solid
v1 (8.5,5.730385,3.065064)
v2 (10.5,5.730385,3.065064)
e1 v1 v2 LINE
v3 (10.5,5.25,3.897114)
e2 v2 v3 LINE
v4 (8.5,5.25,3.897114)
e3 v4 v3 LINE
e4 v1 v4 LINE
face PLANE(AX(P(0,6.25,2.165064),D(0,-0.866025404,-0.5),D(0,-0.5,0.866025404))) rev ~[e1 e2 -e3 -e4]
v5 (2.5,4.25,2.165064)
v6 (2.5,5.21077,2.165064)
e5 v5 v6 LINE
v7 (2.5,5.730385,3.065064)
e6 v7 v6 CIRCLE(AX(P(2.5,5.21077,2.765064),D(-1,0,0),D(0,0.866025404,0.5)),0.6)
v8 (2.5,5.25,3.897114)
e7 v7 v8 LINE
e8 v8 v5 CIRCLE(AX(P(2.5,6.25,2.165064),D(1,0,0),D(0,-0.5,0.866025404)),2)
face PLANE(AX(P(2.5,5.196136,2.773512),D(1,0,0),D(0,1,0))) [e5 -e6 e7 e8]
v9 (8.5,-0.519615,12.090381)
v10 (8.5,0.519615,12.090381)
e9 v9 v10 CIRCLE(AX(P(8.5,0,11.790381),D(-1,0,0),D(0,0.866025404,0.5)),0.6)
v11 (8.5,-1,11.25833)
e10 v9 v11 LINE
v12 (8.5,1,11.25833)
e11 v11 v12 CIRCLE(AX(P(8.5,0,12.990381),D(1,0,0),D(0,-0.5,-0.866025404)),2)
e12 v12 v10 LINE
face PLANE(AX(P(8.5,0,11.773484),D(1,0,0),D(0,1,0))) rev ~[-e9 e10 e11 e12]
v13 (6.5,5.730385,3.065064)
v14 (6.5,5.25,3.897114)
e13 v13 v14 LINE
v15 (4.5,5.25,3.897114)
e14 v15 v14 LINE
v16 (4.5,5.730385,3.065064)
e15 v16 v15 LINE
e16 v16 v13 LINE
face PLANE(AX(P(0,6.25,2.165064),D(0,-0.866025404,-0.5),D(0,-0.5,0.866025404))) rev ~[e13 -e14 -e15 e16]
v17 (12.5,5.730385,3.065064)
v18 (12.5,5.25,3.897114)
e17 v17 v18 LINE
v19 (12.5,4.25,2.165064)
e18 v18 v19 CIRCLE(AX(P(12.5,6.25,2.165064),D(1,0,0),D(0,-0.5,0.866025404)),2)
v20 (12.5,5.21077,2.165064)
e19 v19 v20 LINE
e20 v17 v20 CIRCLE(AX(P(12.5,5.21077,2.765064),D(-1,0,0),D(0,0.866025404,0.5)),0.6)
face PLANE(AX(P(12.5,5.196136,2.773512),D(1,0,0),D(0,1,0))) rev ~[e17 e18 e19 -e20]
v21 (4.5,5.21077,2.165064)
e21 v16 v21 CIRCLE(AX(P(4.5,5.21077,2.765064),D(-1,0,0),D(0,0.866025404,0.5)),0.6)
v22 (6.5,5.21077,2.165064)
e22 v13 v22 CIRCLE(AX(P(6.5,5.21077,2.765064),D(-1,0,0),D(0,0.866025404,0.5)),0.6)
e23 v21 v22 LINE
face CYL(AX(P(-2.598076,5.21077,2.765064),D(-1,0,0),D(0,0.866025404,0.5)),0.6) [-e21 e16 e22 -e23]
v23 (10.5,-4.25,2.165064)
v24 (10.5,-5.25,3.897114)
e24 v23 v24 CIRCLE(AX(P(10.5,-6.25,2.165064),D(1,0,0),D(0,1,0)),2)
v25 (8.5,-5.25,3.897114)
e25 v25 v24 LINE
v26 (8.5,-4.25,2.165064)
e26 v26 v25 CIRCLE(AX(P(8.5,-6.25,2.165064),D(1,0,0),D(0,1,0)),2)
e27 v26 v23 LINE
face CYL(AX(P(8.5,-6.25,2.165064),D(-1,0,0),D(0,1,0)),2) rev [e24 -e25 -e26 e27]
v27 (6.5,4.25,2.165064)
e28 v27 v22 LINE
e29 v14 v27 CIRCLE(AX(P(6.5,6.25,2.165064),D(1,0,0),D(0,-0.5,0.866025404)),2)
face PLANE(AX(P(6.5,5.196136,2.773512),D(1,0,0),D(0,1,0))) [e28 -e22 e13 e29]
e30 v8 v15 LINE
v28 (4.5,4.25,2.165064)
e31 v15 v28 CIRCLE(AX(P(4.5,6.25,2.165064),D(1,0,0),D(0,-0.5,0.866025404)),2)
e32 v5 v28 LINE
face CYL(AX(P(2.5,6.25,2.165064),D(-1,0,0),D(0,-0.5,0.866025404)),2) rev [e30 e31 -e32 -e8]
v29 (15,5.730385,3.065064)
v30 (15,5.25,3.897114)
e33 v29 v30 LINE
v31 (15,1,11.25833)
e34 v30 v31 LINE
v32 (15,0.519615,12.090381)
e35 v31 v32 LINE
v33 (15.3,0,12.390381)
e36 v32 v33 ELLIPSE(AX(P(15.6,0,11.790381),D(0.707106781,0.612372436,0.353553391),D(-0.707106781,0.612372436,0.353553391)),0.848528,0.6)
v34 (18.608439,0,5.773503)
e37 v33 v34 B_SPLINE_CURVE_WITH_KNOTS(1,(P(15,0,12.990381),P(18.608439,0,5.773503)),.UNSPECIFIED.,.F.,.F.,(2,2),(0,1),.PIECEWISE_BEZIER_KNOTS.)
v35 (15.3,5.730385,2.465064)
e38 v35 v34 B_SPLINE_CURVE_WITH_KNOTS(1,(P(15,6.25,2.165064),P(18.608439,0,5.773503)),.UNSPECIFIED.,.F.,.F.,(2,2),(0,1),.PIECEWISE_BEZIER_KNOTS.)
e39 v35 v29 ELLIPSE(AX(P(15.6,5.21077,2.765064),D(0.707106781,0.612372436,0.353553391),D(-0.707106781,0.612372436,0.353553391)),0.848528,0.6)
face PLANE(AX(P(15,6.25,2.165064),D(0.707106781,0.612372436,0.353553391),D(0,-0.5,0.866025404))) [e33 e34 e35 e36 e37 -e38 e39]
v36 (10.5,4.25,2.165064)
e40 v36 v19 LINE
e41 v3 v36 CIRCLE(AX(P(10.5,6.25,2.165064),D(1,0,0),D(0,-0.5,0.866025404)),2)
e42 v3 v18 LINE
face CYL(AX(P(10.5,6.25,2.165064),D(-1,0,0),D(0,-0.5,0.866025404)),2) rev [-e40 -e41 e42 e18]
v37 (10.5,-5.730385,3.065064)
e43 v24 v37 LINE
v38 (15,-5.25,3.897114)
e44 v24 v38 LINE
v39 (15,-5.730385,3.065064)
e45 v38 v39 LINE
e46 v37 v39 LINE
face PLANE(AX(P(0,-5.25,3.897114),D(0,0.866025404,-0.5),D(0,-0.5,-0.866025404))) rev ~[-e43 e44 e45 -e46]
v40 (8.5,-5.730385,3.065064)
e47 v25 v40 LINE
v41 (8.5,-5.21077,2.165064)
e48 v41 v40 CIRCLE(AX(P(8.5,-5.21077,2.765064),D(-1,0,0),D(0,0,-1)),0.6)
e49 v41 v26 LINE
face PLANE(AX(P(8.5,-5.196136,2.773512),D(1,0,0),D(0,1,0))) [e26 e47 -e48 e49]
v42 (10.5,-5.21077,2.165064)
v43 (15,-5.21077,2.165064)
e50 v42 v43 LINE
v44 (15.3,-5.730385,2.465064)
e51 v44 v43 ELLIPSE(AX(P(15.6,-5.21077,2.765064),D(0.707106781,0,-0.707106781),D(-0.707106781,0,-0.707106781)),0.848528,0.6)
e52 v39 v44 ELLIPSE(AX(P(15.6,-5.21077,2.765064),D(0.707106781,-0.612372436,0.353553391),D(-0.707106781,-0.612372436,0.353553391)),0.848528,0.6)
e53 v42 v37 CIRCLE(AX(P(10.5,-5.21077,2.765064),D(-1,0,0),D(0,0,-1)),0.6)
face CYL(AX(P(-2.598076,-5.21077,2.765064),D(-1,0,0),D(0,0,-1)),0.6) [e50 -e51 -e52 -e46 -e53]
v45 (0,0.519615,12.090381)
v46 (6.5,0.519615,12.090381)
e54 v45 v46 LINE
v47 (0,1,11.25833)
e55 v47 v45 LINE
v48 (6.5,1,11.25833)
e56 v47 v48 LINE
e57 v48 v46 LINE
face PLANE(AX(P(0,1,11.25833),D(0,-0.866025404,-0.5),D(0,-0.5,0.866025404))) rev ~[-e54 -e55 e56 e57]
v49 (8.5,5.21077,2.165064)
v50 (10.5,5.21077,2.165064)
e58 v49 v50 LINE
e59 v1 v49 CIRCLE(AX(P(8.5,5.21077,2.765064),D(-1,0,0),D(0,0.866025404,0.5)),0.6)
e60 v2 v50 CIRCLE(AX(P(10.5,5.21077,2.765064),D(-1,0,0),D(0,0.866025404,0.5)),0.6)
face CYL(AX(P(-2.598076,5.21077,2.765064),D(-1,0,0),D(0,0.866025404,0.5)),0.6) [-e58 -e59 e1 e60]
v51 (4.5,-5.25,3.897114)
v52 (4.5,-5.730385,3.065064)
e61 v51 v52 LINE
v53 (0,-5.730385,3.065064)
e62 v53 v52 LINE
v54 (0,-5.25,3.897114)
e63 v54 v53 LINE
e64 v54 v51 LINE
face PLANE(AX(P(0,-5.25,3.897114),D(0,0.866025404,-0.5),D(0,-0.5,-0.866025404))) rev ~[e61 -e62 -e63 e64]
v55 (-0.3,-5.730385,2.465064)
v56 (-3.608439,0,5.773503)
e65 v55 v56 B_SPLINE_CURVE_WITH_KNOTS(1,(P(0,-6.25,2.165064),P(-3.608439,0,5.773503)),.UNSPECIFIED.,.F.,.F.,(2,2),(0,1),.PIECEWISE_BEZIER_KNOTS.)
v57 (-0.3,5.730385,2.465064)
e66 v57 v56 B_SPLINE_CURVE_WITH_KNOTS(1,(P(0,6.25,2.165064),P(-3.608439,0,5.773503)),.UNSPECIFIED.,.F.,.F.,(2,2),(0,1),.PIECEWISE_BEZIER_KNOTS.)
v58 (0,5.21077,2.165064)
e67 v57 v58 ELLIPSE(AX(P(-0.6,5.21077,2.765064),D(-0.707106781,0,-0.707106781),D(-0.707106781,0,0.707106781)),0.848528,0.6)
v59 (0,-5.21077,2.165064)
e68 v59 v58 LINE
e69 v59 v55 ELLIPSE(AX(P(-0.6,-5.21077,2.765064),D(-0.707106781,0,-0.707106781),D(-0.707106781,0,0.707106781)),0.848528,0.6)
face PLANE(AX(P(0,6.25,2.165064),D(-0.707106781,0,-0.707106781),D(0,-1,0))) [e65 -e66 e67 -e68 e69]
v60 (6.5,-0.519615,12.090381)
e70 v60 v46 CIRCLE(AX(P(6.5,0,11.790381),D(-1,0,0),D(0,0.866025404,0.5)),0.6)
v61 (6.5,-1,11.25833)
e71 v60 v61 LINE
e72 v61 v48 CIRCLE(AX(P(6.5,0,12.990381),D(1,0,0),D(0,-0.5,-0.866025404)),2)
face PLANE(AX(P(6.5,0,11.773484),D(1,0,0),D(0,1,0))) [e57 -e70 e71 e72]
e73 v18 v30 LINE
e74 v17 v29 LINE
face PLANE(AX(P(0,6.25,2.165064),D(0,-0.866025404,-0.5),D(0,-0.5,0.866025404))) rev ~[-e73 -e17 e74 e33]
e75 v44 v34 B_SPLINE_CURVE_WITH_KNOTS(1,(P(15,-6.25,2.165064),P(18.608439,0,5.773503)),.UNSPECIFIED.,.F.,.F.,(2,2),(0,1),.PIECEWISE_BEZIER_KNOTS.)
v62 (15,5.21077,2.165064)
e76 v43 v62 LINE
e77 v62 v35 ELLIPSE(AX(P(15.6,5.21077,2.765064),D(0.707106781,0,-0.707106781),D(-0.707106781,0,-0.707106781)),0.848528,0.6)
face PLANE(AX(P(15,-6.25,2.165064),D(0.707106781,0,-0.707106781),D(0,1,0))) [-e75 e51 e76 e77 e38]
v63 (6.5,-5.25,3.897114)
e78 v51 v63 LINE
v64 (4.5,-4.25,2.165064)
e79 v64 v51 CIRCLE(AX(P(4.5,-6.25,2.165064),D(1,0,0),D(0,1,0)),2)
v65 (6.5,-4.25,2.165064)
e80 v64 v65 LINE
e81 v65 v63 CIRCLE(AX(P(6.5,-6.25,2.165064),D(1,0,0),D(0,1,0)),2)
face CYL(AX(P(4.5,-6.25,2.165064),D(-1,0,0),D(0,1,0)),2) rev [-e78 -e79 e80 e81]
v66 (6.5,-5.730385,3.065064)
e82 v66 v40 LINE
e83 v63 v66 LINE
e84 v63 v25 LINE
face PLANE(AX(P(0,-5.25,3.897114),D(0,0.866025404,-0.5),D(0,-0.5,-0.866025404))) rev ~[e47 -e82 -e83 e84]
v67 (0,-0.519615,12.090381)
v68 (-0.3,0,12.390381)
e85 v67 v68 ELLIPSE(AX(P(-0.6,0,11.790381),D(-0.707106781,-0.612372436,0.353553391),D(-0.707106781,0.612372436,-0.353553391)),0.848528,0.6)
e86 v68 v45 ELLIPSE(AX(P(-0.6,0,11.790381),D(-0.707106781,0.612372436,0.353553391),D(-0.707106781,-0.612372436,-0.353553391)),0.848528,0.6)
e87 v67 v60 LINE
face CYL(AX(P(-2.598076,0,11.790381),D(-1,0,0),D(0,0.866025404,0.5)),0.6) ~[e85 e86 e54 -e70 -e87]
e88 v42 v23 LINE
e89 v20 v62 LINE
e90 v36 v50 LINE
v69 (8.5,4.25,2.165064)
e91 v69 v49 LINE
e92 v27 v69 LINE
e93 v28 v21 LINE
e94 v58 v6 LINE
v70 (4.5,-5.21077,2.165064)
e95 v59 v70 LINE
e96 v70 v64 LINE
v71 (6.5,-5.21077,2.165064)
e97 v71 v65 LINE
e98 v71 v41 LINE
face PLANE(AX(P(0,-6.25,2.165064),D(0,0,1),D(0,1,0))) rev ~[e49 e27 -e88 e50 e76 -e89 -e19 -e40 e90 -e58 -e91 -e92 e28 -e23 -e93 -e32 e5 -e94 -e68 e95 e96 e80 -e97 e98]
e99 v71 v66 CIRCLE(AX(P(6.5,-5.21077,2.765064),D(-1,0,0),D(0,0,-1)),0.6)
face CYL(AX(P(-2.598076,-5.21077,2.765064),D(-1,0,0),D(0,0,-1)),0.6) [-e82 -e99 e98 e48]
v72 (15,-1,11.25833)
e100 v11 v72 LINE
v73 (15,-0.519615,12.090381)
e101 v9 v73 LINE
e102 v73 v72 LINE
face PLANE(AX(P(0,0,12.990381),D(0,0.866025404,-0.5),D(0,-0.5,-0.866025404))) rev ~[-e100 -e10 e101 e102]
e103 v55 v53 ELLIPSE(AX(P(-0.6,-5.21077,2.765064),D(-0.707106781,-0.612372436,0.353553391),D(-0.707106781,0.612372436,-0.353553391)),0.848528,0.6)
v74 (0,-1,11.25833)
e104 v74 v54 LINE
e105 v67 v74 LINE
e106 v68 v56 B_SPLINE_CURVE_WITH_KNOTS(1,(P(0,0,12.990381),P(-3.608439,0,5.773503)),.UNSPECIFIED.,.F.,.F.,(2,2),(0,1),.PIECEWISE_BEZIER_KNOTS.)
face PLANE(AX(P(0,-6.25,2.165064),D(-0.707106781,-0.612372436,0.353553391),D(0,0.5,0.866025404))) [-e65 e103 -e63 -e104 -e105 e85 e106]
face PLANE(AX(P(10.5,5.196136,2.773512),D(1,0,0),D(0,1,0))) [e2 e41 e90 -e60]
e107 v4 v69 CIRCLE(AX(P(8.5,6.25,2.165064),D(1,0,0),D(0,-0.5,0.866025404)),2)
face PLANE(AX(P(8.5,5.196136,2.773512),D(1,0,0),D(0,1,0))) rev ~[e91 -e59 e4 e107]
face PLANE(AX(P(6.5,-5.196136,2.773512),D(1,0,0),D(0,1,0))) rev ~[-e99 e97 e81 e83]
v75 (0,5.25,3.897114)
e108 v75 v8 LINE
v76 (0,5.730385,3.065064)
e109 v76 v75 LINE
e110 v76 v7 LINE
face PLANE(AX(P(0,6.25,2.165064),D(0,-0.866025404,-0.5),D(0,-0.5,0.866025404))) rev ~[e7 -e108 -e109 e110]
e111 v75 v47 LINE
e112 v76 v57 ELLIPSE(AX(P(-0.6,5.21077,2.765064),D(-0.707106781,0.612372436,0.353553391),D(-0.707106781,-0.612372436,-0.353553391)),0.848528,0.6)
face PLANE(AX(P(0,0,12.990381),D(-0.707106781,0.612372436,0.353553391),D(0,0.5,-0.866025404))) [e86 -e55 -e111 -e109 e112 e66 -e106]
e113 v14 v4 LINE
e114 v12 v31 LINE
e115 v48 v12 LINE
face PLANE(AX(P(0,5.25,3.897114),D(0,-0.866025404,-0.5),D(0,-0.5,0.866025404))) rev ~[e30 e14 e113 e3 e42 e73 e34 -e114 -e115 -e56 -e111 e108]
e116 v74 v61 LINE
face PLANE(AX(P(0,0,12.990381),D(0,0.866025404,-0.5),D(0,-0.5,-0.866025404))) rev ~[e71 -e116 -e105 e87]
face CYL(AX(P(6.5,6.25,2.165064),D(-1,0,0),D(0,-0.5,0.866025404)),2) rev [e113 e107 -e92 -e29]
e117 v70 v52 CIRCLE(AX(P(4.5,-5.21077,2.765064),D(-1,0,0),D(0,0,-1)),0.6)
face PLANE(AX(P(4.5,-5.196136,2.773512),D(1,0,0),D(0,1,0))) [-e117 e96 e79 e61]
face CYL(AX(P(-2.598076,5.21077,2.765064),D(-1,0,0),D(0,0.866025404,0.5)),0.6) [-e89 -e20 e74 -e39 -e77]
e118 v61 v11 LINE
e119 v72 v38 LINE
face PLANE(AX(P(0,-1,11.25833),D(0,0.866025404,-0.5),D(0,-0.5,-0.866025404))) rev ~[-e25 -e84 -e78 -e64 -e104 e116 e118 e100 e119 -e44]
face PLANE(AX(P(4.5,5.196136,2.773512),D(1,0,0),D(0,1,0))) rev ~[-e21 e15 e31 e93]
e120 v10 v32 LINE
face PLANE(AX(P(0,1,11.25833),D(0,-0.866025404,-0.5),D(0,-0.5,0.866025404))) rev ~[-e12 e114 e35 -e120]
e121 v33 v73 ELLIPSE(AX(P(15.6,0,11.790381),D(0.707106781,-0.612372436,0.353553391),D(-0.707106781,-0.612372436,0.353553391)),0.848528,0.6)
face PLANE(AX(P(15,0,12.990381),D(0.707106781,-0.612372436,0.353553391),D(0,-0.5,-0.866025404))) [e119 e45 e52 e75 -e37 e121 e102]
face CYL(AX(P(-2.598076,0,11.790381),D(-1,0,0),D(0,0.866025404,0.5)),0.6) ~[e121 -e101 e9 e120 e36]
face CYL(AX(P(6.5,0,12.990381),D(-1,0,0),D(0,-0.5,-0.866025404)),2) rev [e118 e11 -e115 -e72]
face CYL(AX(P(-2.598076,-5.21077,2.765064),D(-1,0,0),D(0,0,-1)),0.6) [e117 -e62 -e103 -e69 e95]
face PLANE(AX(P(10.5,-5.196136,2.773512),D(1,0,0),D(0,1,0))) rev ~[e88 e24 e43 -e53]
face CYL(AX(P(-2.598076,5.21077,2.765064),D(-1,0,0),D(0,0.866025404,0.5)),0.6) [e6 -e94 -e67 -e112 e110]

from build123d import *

# Parameters (mm, degrees)
F1_DEPTH    = 15
F4_T1_DEPTH = 20.1961524227
F5_START    = 6.5
F5_DEPTH    = 2
F6_START    = 4.5
F6_DEPTH    = 2
F7_START    = 8.5
F7_DEPTH    = 2
F8_START    = 2.5
F8_DEPTH    = 2
F9_START    = 6.5
F9_DEPTH    = 2
F10_START   = 10.5
F10_DEPTH   = 2


# Not quite as in the source:
# - a fillet or chamfer that OpenCascade refuses, or shapes differently, is made with other operations: its cross-section is extruded or revolved along the edge and cut away or added
# - an extrude whose draft closes it to a point is written as a loft to that point
# - a feature names something its author has since deleted; it is built from what else it names


with BuildPart() as f1:
    # F0 (on Right) → F1 (new body)
    with BuildSketch(Plane.YZ):
        with BuildLine():
            Line((4.25, 2.1650635095), (6.25, 2.1650635095))
            Line((6.25, 2.1650635095), (5.25, 3.897114317))
            ThreePointArc((5.25, 3.897114317), (4.5179491924, 3.1650635095), (4.25, 2.1650635095))
        make_face()
        with BuildLine():
            ThreePointArc((4.25, 2.1650635095), (4.5179491924, 3.1650635095), (5.25, 3.897114317))
            Line((5.25, 3.897114317), (1, 11.2583302492))
            ThreePointArc((1, 11.2583302492), (0, 10.9903810568), (-1, 11.2583302492))
            Line((-1, 11.2583302492), (-5.25, 3.897114317))
            ThreePointArc((-5.25, 3.897114317), (-4.5179491924, 3.1650635095), (-4.25, 2.1650635095))
            Line((-4.25, 2.1650635095), (4.25, 2.1650635095))
        make_face()
        with BuildLine():
            ThreePointArc((-1, 11.2583302492), (0, 10.9903810568), (1, 11.2583302492))
            Line((1, 11.2583302492), (0, 12.9903810568))
            Line((0, 12.9903810568), (-1, 11.2583302492))
        make_face()
        with BuildLine():
            Line((-6.25, 2.1650635095), (-4.25, 2.1650635095))
            ThreePointArc((-4.25, 2.1650635095), (-4.5179491924, 3.1650635095), (-5.25, 3.897114317))
            Line((-5.25, 3.897114317), (-6.25, 2.1650635095))
        make_face()
    extrude(amount=F1_DEPTH)

    # F1_face (on face) → F2 section 0
    with BuildSketch(Plane(origin=(0, 0, 5.7735026919), x_dir=(0, 1, 0), z_dir=(-1, 0, 0)), mode=Mode.PRIVATE) as f2_s0:
        Polygon((0, -7.2168783649), (6.25, 3.6084391824), (-6.25, 3.6084391824), align=None)
    loft([f2_s0.sketch, Vertex(-3.6084391824, 0, 5.7735026919)], ruled=True)

    # F1_face1 (on face) → F3 section 0
    with BuildSketch(Plane(origin=(15, 0, 5.7735026919), x_dir=(0, 1, 0), z_dir=(1, 0, 0)), mode=Mode.PRIVATE) as f3_s0:
        Polygon((6.25, -3.6084391824), (0, 7.2168783649), (-6.25, -3.6084391824), align=None)
    loft([f3_s0.sketch, Vertex(18.6084391824, 0, 5.7735026919)], ruled=True)

    # F4: fillet of radius 0.6 on 3 edges, made by hand

    # F4_s2 → F4_t1 (cut)
    with BuildSketch(Plane.YZ.offset(-2.5980762114)):
        with BuildLine():
            ThreePointArc((0.5196152423, 12.0903810568), (0, 12.3903810568), (-0.5196152423, 12.0903810568))
            Line((-0.5196152423, 12.0903810568), (0, 12.9903810568))
            Line((0, 12.9903810568), (0.5196152423, 12.0903810568))
        make_face()
        with BuildLine():
            ThreePointArc((-5.2107695155, 2.1650635095), (-5.7303847577, 2.4650635095), (-5.7303847577, 3.0650635095))
            Line((-5.7303847577, 3.0650635095), (-6.25, 2.1650635095))
            Line((-6.25, 2.1650635095), (-5.2107695155, 2.1650635095))
        make_face()
        with BuildLine():
            ThreePointArc((5.7303847577, 3.0650635095), (5.7303847577, 2.4650635095), (5.2107695155, 2.1650635095))
            Line((5.2107695155, 2.1650635095), (6.25, 2.1650635095))
            Line((6.25, 2.1650635095), (5.7303847577, 3.0650635095))
        make_face()
    extrude(amount=F4_T1_DEPTH, mode=Mode.SUBTRACT)

    # F0 (on Right) → F5 (cut)
    with BuildSketch(Plane.YZ.offset(F5_START)):
        with BuildLine():
            ThreePointArc((-1, 11.2583302492), (0, 10.9903810568), (1, 11.2583302492))
            Line((1, 11.2583302492), (0, 12.9903810568))
            Line((0, 12.9903810568), (-1, 11.2583302492))
        make_face()
    extrude(amount=F5_DEPTH, mode=Mode.SUBTRACT)

    # F0 (on Right) → F6 (cut)
    with BuildSketch(Plane.YZ.offset(F6_START)):
        with BuildLine():
            Line((-6.25, 2.1650635095), (-4.25, 2.1650635095))
            ThreePointArc((-4.25, 2.1650635095), (-4.5179491924, 3.1650635095), (-5.25, 3.897114317))
            Line((-5.25, 3.897114317), (-6.25, 2.1650635095))
        make_face()
    extrude(amount=F6_DEPTH, mode=Mode.SUBTRACT)

    # F0 (on Right) → F7 (cut)
    with BuildSketch(Plane.YZ.offset(F7_START)):
        with BuildLine():
            Line((-6.25, 2.1650635095), (-4.25, 2.1650635095))
            ThreePointArc((-4.25, 2.1650635095), (-4.5179491924, 3.1650635095), (-5.25, 3.897114317))
            Line((-5.25, 3.897114317), (-6.25, 2.1650635095))
        make_face()
    extrude(amount=F7_DEPTH, mode=Mode.SUBTRACT)

    # F0 (on Right) → F8 (cut)
    with BuildSketch(Plane.YZ.offset(F8_START)):
        with BuildLine():
            Line((4.25, 2.1650635095), (6.25, 2.1650635095))
            Line((6.25, 2.1650635095), (5.25, 3.897114317))
            ThreePointArc((5.25, 3.897114317), (4.5179491924, 3.1650635095), (4.25, 2.1650635095))
        make_face()
    extrude(amount=F8_DEPTH, mode=Mode.SUBTRACT)

    # F0 (on Right) → F9 (cut)
    with BuildSketch(Plane.YZ.offset(F9_START)):
        with BuildLine():
            Line((4.25, 2.1650635095), (6.25, 2.1650635095))
            Line((6.25, 2.1650635095), (5.25, 3.897114317))
            ThreePointArc((5.25, 3.897114317), (4.5179491924, 3.1650635095), (4.25, 2.1650635095))
        make_face()
    extrude(amount=F9_DEPTH, mode=Mode.SUBTRACT)

    # F0 (on Right) → F10 (cut)
    with BuildSketch(Plane.YZ.offset(F10_START)):
        with BuildLine():
            Line((4.25, 2.1650635095), (6.25, 2.1650635095))
            Line((6.25, 2.1650635095), (5.25, 3.897114317))
            ThreePointArc((5.25, 3.897114317), (4.5179491924, 3.1650635095), (4.25, 2.1650635095))
        make_face()
    extrude(amount=F10_DEPTH, mode=Mode.SUBTRACT)


solid = f1.part
